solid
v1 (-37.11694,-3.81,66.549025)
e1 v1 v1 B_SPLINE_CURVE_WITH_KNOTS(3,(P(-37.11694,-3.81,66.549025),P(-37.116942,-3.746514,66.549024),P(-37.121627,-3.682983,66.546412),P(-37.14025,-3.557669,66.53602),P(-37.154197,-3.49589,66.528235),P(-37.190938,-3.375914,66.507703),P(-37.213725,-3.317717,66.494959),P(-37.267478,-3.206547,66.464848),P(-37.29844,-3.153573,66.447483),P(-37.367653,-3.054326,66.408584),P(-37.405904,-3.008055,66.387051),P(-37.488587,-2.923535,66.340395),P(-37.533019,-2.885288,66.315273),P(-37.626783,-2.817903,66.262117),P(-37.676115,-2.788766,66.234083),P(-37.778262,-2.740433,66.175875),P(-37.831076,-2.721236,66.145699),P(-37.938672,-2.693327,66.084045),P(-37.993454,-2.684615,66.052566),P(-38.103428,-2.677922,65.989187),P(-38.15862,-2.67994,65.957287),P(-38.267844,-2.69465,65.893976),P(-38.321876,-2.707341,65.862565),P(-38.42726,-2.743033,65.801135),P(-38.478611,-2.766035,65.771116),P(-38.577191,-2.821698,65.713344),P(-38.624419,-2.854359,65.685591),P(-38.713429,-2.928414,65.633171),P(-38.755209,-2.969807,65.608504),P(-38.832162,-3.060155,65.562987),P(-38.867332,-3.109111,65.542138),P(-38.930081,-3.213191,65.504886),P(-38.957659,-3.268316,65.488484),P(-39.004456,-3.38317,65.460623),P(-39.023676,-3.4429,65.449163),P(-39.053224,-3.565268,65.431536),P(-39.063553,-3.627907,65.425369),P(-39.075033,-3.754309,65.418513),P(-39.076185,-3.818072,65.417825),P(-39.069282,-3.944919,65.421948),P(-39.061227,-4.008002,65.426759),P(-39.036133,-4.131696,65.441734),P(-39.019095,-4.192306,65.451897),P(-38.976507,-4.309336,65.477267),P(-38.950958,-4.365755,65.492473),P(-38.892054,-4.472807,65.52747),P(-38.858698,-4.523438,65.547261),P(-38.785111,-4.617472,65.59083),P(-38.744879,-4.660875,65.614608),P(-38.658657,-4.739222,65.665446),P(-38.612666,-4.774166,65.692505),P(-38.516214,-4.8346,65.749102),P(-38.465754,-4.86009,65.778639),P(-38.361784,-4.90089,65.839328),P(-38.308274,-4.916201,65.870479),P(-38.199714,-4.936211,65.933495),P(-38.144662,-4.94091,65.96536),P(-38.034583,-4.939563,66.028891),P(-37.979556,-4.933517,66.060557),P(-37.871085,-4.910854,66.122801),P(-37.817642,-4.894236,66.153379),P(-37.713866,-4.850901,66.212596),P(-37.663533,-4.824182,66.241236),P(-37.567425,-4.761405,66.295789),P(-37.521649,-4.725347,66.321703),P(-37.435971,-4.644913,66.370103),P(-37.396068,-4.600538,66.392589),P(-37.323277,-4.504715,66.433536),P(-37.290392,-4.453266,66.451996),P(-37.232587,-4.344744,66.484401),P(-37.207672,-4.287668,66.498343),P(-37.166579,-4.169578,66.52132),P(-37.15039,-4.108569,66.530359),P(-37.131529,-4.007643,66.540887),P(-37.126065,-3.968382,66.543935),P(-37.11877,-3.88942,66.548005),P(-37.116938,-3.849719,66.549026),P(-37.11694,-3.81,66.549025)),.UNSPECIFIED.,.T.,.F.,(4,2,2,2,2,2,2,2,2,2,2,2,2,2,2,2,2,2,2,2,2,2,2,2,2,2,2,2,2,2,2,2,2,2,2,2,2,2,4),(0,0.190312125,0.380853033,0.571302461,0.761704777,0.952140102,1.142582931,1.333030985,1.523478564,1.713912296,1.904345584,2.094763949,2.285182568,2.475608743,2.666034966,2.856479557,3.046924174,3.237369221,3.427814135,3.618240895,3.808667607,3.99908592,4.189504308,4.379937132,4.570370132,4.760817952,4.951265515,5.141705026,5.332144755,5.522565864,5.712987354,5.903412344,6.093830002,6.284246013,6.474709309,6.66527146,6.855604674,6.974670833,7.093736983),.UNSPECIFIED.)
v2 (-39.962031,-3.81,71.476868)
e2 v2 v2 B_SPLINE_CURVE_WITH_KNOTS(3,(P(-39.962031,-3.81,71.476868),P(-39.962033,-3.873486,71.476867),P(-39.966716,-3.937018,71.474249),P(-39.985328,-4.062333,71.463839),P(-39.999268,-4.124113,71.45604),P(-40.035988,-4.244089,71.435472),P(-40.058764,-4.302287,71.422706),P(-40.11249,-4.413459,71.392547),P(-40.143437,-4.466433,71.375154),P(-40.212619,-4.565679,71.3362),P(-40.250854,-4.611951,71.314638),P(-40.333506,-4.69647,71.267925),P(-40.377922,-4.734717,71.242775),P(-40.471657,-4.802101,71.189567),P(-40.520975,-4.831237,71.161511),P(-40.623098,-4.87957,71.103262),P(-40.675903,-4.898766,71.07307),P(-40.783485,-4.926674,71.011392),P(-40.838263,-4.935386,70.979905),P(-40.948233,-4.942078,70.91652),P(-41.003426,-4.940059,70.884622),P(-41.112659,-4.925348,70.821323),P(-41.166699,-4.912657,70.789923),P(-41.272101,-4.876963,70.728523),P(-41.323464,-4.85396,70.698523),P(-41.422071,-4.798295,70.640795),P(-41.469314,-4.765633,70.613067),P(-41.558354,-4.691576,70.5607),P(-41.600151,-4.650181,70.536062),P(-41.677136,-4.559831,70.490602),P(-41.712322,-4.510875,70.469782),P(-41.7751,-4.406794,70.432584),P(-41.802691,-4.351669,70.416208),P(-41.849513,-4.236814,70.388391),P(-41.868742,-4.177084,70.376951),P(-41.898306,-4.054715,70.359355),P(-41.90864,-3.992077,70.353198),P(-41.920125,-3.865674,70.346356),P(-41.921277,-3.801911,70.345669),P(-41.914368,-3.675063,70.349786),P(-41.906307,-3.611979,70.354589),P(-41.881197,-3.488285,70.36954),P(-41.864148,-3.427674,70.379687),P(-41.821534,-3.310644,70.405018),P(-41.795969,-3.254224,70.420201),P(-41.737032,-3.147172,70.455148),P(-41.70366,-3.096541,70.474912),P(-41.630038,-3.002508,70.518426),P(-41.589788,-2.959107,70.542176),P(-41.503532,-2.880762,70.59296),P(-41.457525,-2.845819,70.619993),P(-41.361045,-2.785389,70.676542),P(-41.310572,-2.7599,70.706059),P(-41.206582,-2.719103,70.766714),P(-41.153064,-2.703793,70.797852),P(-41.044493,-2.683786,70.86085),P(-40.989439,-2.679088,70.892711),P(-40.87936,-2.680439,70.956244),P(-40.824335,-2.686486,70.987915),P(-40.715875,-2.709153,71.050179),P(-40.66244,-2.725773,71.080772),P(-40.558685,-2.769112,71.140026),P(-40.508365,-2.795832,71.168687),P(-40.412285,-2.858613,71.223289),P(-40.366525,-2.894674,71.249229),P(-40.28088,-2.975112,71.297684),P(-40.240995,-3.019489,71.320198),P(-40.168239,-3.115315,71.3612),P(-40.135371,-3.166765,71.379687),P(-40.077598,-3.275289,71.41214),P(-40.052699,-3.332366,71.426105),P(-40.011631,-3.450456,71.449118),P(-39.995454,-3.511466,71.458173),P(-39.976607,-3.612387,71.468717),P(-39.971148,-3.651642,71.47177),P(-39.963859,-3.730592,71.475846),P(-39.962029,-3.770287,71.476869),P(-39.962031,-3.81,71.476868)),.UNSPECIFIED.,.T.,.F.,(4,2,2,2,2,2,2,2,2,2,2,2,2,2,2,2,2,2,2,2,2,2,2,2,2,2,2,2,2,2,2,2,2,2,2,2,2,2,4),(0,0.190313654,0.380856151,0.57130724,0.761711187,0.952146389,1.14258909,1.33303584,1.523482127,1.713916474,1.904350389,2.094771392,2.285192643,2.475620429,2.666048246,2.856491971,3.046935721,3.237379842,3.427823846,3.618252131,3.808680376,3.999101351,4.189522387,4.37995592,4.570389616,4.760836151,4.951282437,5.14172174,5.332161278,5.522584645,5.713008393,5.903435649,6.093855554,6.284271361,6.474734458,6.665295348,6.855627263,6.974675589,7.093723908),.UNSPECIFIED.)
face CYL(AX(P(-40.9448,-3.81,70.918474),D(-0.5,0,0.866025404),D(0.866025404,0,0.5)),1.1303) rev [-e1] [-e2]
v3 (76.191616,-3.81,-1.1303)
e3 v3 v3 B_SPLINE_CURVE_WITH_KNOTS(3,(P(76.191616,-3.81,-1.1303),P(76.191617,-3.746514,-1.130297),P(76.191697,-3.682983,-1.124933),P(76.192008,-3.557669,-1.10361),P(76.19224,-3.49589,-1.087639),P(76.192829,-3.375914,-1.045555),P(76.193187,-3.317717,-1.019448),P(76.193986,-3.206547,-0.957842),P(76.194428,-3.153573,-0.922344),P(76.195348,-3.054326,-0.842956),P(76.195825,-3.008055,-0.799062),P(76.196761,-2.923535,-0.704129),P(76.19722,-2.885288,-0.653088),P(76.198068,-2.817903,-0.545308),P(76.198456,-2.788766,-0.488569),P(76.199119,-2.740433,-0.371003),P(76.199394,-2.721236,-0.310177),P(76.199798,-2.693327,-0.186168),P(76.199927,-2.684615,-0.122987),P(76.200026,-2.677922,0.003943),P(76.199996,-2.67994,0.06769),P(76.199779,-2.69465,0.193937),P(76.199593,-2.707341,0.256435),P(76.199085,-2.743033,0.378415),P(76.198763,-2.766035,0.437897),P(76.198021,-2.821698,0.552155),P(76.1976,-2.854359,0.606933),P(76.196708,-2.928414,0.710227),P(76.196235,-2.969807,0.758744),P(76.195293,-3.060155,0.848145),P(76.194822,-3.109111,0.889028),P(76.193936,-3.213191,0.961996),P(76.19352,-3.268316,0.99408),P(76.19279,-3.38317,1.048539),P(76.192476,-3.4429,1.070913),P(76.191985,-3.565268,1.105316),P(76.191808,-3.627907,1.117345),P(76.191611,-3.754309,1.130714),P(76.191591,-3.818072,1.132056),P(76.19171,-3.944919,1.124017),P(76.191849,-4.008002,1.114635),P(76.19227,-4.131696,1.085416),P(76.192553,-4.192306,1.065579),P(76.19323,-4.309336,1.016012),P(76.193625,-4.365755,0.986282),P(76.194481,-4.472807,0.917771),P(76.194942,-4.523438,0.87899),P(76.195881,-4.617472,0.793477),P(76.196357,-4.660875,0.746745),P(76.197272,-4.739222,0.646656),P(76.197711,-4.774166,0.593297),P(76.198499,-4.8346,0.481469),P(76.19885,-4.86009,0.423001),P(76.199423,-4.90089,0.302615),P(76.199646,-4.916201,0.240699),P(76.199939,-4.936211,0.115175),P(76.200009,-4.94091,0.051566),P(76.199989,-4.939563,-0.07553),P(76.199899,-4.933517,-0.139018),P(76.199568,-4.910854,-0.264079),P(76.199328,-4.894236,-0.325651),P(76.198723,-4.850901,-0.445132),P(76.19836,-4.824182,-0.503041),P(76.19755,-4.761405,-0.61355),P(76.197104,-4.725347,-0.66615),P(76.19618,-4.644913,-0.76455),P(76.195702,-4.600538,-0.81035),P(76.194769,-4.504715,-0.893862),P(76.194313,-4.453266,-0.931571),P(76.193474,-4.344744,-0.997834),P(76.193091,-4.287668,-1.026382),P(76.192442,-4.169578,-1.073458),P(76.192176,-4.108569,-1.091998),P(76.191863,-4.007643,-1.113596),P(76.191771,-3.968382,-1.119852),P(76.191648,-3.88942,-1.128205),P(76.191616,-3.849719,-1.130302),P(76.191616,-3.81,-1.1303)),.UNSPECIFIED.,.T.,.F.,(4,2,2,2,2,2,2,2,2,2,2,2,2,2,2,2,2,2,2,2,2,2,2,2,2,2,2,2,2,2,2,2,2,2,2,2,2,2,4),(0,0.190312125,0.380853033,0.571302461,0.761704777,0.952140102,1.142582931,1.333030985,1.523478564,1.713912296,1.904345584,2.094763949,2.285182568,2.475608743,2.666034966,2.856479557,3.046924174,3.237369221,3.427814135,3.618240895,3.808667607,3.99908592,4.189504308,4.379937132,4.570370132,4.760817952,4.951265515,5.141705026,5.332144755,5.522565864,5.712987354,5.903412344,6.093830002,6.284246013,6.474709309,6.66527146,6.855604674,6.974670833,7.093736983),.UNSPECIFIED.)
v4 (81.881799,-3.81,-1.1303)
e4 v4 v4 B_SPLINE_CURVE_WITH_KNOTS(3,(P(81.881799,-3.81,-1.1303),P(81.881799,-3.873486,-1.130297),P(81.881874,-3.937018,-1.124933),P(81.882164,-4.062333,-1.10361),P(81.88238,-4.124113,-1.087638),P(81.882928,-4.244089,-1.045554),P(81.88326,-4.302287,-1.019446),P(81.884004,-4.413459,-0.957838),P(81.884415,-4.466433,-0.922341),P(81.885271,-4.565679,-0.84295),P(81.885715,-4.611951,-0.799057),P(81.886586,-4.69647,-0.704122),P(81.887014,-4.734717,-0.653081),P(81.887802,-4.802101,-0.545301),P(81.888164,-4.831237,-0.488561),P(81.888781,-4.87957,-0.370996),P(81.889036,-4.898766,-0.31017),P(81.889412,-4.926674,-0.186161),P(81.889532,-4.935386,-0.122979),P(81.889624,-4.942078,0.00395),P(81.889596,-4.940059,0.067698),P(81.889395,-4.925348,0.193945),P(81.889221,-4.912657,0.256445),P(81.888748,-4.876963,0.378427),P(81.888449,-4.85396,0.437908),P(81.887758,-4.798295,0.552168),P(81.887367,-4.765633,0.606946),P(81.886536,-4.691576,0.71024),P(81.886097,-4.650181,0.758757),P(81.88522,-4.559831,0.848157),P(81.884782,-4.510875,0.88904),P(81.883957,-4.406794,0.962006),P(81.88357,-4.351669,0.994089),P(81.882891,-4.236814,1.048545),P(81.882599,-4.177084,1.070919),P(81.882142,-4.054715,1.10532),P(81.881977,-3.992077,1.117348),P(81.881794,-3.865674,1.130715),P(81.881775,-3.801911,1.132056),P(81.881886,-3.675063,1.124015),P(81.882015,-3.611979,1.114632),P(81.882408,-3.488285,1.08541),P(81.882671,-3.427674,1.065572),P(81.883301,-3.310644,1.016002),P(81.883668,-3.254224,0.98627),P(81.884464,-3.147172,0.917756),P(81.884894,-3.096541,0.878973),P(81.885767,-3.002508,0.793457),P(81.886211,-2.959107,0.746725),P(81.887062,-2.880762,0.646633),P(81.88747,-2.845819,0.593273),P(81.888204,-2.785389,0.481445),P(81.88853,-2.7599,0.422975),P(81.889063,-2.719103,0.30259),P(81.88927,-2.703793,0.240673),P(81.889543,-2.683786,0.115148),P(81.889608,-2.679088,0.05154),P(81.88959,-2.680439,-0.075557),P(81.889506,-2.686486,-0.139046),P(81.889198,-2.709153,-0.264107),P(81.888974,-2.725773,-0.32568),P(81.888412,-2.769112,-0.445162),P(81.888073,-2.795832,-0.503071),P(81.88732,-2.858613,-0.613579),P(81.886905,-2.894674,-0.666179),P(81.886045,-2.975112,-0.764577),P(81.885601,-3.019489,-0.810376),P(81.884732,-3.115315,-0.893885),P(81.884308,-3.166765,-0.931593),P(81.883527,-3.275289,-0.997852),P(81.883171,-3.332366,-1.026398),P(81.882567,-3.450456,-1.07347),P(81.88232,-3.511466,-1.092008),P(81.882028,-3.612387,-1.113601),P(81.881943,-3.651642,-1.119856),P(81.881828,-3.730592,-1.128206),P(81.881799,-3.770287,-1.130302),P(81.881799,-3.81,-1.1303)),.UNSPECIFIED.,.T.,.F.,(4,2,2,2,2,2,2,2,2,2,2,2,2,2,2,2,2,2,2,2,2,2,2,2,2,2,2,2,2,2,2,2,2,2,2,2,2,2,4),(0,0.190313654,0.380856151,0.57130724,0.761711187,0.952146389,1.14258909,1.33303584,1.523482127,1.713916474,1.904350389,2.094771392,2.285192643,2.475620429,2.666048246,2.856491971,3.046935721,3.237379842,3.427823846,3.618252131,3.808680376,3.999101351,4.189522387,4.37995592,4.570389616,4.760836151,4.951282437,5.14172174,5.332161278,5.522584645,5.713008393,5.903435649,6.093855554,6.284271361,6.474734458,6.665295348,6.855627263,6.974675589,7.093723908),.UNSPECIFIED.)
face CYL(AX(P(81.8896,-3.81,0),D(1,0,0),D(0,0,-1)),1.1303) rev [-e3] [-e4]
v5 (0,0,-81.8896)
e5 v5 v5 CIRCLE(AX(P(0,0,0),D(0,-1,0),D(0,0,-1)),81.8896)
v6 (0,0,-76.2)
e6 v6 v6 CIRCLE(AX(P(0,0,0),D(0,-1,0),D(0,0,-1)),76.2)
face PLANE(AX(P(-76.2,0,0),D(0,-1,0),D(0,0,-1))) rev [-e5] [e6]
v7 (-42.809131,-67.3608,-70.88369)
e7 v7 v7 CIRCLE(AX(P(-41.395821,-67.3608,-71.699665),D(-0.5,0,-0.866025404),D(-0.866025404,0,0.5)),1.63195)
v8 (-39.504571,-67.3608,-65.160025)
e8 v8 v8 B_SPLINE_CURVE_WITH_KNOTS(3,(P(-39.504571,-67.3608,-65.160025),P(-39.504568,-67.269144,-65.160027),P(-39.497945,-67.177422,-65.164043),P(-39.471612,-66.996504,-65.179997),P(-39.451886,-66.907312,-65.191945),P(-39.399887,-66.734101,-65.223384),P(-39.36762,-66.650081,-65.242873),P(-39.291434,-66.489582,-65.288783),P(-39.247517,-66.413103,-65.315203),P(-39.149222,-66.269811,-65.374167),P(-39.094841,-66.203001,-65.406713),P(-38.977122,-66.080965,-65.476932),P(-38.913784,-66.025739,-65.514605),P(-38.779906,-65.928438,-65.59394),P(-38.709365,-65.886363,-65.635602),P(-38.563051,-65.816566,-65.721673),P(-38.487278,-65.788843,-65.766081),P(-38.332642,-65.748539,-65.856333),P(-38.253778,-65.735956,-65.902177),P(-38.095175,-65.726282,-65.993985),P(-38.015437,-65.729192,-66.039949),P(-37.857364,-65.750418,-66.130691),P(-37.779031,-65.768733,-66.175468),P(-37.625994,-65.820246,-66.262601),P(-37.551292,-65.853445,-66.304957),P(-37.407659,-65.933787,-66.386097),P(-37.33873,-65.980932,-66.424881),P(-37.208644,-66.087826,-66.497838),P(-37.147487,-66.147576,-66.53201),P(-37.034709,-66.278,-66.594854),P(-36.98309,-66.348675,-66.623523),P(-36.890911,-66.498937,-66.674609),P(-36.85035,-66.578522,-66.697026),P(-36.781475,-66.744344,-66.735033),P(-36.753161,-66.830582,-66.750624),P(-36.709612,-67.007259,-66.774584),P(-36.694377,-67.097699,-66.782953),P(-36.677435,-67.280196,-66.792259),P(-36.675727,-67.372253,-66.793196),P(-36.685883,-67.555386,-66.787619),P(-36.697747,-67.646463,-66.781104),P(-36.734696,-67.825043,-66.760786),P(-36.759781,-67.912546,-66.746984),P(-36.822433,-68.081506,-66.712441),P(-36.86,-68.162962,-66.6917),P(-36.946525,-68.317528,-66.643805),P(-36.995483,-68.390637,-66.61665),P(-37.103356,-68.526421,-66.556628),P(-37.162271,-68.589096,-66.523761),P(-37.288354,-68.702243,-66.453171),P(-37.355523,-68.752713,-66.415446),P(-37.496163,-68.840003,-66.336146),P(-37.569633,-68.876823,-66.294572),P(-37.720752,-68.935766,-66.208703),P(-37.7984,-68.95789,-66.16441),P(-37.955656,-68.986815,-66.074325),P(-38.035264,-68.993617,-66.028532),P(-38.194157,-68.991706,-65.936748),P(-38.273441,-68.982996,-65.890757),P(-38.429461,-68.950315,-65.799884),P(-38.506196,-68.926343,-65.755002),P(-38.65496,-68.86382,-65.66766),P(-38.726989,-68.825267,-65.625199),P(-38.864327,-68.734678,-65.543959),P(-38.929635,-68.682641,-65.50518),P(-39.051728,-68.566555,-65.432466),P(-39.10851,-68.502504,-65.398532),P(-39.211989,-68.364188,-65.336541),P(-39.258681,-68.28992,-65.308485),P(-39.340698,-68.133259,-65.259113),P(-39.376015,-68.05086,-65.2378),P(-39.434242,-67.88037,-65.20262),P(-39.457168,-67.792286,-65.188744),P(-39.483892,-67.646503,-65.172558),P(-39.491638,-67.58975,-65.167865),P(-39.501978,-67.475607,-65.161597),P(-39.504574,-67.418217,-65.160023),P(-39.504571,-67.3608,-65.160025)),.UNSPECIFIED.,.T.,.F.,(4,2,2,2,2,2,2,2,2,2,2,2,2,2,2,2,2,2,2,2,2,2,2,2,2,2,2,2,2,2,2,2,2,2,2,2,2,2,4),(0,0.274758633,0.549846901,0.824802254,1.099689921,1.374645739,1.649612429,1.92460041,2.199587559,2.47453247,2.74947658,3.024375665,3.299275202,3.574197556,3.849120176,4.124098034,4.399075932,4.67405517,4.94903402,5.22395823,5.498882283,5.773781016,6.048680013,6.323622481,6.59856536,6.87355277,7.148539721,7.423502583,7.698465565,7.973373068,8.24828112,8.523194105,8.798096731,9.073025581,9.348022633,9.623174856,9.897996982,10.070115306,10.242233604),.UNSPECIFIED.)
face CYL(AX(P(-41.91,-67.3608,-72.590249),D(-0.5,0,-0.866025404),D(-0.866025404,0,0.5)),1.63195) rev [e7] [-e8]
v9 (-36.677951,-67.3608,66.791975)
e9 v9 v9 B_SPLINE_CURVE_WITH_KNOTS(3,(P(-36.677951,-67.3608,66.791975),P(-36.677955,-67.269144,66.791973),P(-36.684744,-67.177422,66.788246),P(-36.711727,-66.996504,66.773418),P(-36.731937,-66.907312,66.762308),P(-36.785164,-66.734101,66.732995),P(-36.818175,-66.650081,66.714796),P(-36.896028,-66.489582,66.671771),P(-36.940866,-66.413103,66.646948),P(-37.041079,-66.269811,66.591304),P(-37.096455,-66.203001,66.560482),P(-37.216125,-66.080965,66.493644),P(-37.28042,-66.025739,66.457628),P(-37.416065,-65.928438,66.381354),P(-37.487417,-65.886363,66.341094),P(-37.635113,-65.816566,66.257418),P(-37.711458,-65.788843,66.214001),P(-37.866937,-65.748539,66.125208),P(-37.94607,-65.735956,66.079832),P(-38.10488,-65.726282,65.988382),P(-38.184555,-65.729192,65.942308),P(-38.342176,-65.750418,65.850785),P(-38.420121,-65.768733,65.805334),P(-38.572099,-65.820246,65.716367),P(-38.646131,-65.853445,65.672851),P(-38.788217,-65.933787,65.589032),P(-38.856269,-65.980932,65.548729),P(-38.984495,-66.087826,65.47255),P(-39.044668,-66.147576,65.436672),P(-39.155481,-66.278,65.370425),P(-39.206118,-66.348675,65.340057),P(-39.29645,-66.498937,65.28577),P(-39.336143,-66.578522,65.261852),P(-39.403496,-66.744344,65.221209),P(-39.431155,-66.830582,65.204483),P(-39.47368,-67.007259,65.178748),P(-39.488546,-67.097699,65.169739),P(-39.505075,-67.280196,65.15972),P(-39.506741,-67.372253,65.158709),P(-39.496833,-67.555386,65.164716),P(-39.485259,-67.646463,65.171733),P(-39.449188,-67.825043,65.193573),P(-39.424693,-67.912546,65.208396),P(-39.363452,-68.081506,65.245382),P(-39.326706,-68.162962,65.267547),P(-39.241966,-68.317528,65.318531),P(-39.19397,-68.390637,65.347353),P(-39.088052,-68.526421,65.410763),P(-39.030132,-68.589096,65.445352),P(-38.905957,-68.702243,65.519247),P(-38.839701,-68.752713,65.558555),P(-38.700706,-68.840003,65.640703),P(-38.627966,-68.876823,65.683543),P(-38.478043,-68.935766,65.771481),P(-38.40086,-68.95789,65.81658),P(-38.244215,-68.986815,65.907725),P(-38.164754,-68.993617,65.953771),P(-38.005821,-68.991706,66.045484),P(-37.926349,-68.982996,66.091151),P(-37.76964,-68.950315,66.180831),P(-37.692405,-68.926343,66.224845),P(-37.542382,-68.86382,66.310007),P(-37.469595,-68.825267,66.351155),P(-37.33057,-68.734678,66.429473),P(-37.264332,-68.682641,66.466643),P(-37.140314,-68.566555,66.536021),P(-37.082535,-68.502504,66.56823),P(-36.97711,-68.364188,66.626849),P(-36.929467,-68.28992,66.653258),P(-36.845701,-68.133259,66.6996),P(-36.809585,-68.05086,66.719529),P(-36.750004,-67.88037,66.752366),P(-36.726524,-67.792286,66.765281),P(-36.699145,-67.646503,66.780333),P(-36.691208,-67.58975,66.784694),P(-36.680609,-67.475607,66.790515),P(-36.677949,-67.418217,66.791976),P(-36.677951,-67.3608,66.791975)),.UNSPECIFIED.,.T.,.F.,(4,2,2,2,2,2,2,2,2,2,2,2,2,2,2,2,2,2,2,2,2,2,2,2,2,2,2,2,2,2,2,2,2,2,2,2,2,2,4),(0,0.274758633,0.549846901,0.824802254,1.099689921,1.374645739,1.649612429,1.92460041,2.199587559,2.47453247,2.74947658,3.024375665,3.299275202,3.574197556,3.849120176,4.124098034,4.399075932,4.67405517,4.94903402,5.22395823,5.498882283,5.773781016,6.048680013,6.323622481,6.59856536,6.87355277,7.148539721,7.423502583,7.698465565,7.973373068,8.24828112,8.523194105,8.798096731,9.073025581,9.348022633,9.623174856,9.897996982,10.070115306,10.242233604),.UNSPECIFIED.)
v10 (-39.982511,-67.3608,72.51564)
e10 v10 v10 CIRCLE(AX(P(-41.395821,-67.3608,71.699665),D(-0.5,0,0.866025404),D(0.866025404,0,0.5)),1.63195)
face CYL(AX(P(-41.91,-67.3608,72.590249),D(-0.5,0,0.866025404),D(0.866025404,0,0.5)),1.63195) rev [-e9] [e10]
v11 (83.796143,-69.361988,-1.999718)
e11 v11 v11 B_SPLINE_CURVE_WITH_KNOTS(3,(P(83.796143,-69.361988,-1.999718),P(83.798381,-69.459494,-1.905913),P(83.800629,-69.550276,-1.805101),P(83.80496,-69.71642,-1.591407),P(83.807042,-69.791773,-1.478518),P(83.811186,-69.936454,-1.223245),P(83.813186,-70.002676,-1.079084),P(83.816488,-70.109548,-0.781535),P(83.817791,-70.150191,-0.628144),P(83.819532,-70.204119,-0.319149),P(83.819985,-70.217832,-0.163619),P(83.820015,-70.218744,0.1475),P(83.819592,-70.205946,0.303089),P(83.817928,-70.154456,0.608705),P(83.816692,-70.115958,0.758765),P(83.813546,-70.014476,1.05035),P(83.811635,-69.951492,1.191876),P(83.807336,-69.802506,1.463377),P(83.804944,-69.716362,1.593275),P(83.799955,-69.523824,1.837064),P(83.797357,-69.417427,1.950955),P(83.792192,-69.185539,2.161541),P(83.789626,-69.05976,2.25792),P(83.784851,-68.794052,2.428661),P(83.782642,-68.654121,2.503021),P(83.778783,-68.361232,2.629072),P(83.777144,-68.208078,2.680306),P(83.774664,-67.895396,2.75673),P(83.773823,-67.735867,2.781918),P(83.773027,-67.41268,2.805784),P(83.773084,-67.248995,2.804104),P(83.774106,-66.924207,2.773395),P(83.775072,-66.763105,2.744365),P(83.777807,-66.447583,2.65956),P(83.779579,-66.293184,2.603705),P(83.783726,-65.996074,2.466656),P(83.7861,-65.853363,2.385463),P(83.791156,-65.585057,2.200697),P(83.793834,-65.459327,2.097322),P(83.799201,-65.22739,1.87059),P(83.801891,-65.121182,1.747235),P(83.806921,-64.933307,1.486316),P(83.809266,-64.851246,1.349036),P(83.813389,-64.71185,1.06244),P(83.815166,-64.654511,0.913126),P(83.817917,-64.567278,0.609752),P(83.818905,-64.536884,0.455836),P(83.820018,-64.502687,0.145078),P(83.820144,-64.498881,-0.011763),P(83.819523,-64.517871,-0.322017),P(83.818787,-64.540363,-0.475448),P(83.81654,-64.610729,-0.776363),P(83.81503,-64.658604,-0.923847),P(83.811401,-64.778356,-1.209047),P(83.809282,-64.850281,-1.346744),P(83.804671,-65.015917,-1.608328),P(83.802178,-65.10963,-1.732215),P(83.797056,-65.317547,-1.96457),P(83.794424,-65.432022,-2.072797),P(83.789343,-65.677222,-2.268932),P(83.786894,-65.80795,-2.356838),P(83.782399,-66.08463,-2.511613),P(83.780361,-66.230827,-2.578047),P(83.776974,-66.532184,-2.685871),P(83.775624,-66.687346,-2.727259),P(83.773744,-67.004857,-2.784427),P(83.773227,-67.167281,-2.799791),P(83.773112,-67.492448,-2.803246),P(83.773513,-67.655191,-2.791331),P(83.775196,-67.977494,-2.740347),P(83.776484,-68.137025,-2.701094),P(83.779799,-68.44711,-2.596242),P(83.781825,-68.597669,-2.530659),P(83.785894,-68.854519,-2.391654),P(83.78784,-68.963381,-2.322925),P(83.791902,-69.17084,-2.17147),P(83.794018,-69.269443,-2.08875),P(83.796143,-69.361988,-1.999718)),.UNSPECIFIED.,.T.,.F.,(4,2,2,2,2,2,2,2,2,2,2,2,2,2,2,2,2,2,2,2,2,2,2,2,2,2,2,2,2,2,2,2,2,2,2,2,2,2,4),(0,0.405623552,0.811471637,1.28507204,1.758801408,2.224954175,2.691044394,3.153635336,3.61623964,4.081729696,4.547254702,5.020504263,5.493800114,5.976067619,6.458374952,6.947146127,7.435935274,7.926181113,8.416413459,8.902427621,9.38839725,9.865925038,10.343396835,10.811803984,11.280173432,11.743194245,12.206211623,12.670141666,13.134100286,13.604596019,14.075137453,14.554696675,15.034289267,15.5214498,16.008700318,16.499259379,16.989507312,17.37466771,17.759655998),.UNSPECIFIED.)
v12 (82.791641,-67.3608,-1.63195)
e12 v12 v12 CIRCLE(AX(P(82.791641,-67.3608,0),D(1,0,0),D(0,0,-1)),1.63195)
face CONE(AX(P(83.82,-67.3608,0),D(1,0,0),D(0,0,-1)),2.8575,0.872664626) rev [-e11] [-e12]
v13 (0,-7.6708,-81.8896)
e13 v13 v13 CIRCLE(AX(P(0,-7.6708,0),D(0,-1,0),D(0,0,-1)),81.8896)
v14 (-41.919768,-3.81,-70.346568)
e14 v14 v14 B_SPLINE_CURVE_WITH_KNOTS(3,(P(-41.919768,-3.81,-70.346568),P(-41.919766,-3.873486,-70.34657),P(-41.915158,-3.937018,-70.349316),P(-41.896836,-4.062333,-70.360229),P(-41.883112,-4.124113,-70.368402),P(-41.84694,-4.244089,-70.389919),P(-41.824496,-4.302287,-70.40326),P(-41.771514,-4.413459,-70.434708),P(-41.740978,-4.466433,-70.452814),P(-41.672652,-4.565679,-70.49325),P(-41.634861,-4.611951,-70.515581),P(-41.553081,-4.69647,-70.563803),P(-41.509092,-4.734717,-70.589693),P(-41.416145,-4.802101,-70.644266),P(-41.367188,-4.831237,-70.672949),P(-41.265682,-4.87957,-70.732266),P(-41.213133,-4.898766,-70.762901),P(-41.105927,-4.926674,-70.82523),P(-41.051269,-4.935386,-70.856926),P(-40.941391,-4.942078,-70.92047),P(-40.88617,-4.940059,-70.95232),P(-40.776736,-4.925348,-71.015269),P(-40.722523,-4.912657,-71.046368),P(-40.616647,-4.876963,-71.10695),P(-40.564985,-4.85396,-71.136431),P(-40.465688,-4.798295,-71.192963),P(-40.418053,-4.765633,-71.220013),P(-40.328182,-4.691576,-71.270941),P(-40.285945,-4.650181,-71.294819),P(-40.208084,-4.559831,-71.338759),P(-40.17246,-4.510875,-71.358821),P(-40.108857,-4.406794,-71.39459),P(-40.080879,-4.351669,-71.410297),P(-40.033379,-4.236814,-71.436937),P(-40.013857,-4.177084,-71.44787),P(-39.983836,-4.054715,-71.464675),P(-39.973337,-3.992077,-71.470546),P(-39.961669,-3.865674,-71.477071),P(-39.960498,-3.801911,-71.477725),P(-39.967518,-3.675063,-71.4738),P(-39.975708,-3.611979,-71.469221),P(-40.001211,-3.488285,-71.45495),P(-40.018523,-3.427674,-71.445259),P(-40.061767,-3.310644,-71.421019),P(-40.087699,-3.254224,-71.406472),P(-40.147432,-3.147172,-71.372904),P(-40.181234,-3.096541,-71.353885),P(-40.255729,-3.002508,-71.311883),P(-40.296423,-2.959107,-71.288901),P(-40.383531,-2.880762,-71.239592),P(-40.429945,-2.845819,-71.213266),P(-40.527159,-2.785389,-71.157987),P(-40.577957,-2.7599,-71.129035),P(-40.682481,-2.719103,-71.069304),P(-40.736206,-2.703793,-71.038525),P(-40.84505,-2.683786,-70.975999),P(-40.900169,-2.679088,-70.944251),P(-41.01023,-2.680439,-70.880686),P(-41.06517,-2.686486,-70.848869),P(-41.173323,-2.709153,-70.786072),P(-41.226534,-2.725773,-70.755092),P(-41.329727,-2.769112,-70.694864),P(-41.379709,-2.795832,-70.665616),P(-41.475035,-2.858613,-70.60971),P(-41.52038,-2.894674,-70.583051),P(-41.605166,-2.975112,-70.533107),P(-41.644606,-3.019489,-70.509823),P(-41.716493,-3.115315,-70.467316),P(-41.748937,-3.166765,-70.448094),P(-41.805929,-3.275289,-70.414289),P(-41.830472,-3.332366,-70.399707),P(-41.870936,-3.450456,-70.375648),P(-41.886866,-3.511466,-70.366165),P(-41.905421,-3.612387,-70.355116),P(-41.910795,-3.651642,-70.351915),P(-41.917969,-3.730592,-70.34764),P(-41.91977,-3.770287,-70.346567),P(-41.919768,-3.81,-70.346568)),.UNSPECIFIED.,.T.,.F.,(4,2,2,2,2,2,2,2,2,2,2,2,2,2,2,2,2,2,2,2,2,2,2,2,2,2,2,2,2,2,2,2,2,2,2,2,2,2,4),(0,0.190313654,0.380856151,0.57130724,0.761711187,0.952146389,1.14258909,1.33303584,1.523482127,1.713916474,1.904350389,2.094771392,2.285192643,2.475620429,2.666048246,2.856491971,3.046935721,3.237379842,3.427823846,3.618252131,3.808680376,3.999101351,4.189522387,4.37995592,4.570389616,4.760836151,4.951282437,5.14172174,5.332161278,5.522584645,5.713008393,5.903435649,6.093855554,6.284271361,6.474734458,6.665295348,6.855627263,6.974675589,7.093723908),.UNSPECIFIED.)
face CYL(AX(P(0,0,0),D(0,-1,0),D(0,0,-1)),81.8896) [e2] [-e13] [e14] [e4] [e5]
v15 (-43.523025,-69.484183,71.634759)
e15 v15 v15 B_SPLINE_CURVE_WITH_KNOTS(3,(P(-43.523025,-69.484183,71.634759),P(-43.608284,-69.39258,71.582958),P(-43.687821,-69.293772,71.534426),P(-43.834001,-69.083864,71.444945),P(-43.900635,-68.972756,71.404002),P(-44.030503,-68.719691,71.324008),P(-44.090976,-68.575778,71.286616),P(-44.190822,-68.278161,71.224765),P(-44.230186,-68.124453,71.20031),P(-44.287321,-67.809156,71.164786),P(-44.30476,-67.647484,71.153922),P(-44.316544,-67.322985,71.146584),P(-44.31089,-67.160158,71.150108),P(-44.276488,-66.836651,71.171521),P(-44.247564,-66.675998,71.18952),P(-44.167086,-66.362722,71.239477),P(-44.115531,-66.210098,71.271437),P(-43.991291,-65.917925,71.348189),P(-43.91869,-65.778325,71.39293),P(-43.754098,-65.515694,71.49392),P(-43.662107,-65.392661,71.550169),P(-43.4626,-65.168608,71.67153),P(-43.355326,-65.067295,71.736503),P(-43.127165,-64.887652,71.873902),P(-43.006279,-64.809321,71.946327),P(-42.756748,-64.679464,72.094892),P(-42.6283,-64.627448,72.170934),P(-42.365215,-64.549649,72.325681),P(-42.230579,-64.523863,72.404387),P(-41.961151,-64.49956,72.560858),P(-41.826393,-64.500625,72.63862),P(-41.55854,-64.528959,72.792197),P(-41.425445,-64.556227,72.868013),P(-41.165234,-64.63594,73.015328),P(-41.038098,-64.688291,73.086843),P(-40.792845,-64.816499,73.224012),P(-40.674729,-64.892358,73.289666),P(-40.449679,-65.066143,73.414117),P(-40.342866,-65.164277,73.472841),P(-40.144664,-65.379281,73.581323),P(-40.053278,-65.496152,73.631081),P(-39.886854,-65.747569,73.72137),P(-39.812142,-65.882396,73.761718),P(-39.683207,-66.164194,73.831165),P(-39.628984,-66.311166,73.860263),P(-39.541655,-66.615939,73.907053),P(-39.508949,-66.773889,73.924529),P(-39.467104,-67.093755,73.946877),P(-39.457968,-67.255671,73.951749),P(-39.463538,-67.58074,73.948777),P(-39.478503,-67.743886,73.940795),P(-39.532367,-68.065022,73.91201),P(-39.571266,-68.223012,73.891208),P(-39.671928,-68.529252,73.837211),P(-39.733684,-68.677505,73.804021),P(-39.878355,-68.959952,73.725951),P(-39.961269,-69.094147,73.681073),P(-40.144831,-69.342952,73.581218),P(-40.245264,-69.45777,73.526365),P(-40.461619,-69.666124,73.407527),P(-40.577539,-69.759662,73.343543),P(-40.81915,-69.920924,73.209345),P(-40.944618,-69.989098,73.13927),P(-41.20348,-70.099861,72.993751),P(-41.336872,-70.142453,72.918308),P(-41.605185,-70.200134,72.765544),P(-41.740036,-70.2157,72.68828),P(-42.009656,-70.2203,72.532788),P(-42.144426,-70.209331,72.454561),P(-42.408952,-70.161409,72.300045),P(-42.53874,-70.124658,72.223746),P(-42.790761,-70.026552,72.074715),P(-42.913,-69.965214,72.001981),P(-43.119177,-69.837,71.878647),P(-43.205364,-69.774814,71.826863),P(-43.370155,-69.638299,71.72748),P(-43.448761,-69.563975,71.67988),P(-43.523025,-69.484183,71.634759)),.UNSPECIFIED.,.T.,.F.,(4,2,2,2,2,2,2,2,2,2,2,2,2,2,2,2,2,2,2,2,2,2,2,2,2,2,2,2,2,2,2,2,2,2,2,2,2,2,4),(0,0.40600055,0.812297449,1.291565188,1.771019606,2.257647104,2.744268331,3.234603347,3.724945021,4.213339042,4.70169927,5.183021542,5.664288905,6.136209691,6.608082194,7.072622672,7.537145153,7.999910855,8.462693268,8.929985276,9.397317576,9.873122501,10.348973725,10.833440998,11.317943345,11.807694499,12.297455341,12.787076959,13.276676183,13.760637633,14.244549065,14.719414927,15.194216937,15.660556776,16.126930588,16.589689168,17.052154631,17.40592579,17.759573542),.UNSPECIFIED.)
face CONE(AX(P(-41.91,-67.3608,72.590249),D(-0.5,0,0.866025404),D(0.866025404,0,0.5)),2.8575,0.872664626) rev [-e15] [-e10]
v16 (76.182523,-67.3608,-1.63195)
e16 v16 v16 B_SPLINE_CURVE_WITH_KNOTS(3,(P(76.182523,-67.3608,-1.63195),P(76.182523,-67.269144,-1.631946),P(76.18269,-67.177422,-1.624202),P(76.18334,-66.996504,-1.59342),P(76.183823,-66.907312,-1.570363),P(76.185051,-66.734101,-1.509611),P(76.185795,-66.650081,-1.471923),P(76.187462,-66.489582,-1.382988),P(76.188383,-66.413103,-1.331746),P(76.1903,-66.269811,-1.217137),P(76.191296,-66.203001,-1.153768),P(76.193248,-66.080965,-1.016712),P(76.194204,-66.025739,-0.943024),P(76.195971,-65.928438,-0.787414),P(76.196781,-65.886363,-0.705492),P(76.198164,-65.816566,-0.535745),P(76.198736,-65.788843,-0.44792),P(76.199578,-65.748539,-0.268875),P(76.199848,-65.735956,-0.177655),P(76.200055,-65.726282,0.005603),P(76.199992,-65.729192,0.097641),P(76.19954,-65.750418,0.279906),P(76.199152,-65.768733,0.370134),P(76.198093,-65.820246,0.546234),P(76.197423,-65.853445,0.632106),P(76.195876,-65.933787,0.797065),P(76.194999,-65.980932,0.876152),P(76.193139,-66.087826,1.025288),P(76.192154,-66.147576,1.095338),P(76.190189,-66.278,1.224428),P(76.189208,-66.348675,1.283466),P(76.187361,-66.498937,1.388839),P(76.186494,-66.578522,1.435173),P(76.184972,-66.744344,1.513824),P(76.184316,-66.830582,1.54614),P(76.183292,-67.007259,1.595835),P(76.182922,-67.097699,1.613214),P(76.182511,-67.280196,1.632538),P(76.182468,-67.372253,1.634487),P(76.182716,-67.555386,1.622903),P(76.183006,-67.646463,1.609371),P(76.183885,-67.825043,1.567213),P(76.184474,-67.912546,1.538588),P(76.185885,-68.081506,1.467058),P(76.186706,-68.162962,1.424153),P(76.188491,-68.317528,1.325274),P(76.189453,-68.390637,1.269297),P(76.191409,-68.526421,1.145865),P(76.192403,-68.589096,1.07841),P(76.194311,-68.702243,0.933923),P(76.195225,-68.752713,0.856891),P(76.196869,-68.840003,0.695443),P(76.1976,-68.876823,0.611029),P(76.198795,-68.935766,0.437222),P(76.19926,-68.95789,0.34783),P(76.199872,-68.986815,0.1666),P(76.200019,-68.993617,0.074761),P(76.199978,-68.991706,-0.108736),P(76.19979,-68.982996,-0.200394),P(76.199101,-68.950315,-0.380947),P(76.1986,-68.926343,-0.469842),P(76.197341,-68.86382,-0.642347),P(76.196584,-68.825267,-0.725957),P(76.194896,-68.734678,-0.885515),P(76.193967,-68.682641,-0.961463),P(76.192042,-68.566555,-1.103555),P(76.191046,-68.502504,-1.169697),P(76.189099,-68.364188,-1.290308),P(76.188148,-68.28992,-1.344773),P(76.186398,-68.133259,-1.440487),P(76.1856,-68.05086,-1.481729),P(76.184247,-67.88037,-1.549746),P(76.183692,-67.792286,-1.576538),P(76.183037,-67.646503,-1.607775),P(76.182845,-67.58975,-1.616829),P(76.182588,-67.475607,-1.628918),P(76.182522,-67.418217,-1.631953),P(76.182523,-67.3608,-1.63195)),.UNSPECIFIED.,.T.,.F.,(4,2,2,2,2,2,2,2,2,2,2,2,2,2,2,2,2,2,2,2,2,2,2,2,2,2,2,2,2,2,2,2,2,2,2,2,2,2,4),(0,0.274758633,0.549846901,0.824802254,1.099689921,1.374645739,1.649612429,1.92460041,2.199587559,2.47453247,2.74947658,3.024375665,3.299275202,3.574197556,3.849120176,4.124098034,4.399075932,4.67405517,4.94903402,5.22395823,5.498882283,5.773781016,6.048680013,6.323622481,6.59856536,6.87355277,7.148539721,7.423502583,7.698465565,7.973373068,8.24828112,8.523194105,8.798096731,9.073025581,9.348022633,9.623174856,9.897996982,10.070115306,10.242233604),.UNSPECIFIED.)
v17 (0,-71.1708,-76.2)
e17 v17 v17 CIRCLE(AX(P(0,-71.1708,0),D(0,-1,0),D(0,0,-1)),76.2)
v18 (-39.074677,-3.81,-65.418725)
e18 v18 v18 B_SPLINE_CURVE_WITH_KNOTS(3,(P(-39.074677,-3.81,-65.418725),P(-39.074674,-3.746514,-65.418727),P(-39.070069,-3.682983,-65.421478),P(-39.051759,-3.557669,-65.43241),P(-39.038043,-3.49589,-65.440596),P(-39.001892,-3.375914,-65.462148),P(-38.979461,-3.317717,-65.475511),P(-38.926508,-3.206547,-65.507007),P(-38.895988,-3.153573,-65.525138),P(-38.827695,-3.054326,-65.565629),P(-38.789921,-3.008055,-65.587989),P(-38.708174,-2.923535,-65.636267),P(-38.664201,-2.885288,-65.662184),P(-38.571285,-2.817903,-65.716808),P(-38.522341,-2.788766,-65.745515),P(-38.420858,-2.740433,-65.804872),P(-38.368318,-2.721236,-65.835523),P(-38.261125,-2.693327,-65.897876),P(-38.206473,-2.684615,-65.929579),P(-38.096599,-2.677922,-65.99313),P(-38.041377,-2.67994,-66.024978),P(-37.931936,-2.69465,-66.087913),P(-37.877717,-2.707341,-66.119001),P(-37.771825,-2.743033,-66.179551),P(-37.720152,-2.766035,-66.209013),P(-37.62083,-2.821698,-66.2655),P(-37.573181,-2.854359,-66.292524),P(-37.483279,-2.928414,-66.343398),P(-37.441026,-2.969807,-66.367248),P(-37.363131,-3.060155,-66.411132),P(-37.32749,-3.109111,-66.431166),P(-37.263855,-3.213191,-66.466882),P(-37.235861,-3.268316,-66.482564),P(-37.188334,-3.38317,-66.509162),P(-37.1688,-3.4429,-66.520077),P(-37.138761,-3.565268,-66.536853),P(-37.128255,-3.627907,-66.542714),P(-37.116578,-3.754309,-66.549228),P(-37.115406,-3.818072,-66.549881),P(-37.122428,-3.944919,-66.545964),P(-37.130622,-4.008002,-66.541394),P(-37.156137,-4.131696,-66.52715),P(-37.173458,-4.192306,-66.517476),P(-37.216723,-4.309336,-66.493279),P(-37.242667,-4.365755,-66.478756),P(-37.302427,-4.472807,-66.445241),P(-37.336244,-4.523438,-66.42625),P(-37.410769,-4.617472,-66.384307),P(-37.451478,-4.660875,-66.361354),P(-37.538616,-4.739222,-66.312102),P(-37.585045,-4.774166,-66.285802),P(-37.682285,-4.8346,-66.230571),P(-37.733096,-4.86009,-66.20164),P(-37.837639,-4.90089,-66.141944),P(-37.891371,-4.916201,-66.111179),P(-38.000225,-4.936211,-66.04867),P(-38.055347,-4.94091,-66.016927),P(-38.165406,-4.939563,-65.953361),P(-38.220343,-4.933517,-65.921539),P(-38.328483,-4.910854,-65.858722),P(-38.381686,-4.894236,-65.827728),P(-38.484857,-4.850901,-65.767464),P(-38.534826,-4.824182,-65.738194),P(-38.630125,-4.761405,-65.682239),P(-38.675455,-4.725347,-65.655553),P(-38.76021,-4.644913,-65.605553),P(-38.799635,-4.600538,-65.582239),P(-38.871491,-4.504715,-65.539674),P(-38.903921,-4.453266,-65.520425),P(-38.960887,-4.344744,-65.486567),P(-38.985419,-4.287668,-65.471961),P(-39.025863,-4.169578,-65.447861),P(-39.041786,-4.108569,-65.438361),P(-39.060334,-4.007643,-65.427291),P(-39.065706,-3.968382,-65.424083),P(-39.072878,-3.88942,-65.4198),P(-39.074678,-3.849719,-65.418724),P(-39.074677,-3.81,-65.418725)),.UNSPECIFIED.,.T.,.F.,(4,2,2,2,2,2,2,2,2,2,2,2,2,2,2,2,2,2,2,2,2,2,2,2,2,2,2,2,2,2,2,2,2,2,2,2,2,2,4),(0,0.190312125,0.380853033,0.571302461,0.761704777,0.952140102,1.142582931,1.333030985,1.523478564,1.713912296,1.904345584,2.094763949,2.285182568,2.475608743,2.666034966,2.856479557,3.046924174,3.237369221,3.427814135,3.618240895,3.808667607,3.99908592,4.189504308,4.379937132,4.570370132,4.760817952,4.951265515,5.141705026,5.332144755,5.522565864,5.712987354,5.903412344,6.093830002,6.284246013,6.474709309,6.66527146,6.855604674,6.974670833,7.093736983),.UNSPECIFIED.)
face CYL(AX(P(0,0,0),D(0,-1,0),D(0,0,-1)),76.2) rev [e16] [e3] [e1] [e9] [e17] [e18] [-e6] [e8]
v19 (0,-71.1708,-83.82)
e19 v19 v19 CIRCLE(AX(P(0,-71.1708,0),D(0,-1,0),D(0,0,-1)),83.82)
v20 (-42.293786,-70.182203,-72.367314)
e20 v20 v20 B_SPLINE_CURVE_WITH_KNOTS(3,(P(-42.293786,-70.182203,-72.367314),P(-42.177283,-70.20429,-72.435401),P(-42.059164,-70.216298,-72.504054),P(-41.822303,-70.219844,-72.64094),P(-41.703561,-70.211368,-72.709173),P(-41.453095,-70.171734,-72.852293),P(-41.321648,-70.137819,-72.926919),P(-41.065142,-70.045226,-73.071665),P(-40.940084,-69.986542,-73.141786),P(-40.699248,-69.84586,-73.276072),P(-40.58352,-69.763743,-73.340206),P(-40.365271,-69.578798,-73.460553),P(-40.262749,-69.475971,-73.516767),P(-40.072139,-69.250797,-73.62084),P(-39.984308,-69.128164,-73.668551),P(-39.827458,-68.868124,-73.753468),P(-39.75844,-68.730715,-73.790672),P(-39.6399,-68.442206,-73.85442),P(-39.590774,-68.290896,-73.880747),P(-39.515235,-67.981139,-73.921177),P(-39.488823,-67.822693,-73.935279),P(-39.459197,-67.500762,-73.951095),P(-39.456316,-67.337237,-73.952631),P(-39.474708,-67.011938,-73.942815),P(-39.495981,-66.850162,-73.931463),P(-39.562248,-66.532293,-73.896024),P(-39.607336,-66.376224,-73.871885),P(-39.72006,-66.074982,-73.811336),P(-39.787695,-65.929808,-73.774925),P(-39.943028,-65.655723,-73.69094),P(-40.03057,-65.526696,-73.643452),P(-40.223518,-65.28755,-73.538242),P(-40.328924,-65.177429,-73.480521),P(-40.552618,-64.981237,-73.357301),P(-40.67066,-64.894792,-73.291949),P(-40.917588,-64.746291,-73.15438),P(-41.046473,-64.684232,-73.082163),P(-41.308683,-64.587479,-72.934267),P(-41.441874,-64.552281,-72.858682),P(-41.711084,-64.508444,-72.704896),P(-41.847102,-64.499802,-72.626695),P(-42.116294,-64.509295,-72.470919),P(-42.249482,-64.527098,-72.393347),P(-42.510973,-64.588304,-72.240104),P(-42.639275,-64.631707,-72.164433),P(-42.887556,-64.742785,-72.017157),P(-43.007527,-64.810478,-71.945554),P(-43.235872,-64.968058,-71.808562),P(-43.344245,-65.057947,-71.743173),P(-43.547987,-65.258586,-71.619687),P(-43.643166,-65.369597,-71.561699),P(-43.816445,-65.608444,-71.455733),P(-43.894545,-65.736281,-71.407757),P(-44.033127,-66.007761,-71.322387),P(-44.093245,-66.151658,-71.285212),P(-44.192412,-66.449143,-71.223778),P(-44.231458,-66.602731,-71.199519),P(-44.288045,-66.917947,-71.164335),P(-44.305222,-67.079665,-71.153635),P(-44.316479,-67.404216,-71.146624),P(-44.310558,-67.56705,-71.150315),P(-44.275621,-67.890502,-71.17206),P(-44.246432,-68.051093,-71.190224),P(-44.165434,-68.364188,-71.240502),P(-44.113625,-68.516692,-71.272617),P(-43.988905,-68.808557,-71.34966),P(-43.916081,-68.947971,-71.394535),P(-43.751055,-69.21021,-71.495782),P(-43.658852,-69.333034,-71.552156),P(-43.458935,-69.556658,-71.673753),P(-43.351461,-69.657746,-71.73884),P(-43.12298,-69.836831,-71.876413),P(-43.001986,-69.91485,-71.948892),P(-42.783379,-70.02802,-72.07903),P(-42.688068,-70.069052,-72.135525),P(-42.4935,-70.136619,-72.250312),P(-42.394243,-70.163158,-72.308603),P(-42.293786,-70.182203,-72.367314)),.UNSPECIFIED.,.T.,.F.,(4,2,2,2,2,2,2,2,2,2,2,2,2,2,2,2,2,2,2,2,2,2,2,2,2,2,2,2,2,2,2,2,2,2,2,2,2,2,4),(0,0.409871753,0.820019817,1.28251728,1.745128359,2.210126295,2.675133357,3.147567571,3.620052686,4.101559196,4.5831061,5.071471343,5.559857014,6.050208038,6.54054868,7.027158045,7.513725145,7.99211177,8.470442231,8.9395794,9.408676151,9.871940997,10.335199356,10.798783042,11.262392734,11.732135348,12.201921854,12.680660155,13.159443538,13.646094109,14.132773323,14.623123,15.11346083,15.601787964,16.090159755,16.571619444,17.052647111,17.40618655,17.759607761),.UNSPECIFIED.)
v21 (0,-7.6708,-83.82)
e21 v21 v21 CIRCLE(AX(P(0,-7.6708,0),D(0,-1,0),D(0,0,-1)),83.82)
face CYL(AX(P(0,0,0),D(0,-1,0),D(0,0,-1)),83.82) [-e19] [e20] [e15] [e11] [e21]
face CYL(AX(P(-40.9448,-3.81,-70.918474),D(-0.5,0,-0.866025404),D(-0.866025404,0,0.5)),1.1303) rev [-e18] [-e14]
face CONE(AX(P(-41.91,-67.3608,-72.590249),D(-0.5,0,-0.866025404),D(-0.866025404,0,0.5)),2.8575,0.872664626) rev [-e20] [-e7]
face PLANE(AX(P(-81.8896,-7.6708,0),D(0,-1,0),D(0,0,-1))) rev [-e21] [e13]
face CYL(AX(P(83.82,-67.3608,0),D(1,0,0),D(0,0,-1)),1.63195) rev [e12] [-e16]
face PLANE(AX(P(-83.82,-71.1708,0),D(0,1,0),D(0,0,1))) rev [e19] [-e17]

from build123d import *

# Parameters (mm, degrees)
F_4_40_TAPPED_HOLE1_REACH  = 199.542
F_4_40_TAPPED_HOLE1_BORE_R = 1.1303
CIRPATTERN1_COUNT          = 3


# Read off the part's stored shape, not the designer's step: CSK for #4 Flat Head Machine Screw (100)1
with BuildPart() as part:
    # Sketch1 → Revolve1 (revolve)
    with BuildSketch(Plane.XY, mode=Mode.PRIVATE) as revolve1_sk:
        Polygon((-76.2, 0), (-81.8896, 0), (-81.8896, -7.6708), (-83.82, -7.6708), (-83.82, -71.1708), (-76.2, -71.1708), align=None)
    revolve(revolve1_sk.sketch.rotate(Axis((0, 0, 0), (0, 1, 0)), 270), axis=Axis((0, 0, 0), (0, 1, 0)))

    # #4-40 Tapped Hole1 bore (on position points) → #4-40 Tapped Hole1 (cut, up to next)
    with BuildSketch(Plane(origin=(81.8896, -3.81, 0), x_dir=(0, 0, 1), z_dir=(1, 0, 0)), mode=Mode.PRIVATE) as f_4_40_tapped_hole1_sk1:
        Circle(F_4_40_TAPPED_HOLE1_BORE_R)
    f_4_40_tapped_hole1_tool1 = extrude(f_4_40_tapped_hole1_sk1.sketch, amount=-F_4_40_TAPPED_HOLE1_REACH, mode=Mode.PRIVATE) & part.part
    f_4_40_tapped_hole1 = f_4_40_tapped_hole1_tool1.solids().sort_by_distance((81.8896, -3.81, 0))[0]
    add(f_4_40_tapped_hole1, mode=Mode.SUBTRACT)

    # CSK for _4 Flat Head Machine Screw _ 2 → CSK for #4 Flat Head Machine Screw (100)1 (revolve, cut)
    with BuildSketch(Plane(origin=(0, -67.3608, 0), x_dir=(0, 1, 0), z_dir=(0, 0, -1))):
        Polygon((2.857519918, 83.820016713), (0, 83.820016713), (0, 76.182513139), (1.63195, 76.182513139), (1.63195, 82.791641447), align=None)
    csk_for_4_flat_head_machine_screw_100 = revolve(axis=Axis((0, -67.3608, 0), (1, 0, 0)), mode=Mode.SUBTRACT)

    # CirPattern1: #4-40 Tapped Hole1, CSK for #4 Flat Head Machine Screw (100)1 ×3 about axis
    cirpattern1_axis = Axis((0, 0, 0), (0, -1, 0))
    add([f_4_40_tapped_hole1.rotate(cirpattern1_axis, i * 360 / CIRPATTERN1_COUNT) for i in range(1, CIRPATTERN1_COUNT)], mode=Mode.SUBTRACT)
    add([csk_for_4_flat_head_machine_screw_100.rotate(cirpattern1_axis, i * 360 / CIRPATTERN1_COUNT) for i in range(1, CIRPATTERN1_COUNT)], mode=Mode.SUBTRACT)


solid = part.part
